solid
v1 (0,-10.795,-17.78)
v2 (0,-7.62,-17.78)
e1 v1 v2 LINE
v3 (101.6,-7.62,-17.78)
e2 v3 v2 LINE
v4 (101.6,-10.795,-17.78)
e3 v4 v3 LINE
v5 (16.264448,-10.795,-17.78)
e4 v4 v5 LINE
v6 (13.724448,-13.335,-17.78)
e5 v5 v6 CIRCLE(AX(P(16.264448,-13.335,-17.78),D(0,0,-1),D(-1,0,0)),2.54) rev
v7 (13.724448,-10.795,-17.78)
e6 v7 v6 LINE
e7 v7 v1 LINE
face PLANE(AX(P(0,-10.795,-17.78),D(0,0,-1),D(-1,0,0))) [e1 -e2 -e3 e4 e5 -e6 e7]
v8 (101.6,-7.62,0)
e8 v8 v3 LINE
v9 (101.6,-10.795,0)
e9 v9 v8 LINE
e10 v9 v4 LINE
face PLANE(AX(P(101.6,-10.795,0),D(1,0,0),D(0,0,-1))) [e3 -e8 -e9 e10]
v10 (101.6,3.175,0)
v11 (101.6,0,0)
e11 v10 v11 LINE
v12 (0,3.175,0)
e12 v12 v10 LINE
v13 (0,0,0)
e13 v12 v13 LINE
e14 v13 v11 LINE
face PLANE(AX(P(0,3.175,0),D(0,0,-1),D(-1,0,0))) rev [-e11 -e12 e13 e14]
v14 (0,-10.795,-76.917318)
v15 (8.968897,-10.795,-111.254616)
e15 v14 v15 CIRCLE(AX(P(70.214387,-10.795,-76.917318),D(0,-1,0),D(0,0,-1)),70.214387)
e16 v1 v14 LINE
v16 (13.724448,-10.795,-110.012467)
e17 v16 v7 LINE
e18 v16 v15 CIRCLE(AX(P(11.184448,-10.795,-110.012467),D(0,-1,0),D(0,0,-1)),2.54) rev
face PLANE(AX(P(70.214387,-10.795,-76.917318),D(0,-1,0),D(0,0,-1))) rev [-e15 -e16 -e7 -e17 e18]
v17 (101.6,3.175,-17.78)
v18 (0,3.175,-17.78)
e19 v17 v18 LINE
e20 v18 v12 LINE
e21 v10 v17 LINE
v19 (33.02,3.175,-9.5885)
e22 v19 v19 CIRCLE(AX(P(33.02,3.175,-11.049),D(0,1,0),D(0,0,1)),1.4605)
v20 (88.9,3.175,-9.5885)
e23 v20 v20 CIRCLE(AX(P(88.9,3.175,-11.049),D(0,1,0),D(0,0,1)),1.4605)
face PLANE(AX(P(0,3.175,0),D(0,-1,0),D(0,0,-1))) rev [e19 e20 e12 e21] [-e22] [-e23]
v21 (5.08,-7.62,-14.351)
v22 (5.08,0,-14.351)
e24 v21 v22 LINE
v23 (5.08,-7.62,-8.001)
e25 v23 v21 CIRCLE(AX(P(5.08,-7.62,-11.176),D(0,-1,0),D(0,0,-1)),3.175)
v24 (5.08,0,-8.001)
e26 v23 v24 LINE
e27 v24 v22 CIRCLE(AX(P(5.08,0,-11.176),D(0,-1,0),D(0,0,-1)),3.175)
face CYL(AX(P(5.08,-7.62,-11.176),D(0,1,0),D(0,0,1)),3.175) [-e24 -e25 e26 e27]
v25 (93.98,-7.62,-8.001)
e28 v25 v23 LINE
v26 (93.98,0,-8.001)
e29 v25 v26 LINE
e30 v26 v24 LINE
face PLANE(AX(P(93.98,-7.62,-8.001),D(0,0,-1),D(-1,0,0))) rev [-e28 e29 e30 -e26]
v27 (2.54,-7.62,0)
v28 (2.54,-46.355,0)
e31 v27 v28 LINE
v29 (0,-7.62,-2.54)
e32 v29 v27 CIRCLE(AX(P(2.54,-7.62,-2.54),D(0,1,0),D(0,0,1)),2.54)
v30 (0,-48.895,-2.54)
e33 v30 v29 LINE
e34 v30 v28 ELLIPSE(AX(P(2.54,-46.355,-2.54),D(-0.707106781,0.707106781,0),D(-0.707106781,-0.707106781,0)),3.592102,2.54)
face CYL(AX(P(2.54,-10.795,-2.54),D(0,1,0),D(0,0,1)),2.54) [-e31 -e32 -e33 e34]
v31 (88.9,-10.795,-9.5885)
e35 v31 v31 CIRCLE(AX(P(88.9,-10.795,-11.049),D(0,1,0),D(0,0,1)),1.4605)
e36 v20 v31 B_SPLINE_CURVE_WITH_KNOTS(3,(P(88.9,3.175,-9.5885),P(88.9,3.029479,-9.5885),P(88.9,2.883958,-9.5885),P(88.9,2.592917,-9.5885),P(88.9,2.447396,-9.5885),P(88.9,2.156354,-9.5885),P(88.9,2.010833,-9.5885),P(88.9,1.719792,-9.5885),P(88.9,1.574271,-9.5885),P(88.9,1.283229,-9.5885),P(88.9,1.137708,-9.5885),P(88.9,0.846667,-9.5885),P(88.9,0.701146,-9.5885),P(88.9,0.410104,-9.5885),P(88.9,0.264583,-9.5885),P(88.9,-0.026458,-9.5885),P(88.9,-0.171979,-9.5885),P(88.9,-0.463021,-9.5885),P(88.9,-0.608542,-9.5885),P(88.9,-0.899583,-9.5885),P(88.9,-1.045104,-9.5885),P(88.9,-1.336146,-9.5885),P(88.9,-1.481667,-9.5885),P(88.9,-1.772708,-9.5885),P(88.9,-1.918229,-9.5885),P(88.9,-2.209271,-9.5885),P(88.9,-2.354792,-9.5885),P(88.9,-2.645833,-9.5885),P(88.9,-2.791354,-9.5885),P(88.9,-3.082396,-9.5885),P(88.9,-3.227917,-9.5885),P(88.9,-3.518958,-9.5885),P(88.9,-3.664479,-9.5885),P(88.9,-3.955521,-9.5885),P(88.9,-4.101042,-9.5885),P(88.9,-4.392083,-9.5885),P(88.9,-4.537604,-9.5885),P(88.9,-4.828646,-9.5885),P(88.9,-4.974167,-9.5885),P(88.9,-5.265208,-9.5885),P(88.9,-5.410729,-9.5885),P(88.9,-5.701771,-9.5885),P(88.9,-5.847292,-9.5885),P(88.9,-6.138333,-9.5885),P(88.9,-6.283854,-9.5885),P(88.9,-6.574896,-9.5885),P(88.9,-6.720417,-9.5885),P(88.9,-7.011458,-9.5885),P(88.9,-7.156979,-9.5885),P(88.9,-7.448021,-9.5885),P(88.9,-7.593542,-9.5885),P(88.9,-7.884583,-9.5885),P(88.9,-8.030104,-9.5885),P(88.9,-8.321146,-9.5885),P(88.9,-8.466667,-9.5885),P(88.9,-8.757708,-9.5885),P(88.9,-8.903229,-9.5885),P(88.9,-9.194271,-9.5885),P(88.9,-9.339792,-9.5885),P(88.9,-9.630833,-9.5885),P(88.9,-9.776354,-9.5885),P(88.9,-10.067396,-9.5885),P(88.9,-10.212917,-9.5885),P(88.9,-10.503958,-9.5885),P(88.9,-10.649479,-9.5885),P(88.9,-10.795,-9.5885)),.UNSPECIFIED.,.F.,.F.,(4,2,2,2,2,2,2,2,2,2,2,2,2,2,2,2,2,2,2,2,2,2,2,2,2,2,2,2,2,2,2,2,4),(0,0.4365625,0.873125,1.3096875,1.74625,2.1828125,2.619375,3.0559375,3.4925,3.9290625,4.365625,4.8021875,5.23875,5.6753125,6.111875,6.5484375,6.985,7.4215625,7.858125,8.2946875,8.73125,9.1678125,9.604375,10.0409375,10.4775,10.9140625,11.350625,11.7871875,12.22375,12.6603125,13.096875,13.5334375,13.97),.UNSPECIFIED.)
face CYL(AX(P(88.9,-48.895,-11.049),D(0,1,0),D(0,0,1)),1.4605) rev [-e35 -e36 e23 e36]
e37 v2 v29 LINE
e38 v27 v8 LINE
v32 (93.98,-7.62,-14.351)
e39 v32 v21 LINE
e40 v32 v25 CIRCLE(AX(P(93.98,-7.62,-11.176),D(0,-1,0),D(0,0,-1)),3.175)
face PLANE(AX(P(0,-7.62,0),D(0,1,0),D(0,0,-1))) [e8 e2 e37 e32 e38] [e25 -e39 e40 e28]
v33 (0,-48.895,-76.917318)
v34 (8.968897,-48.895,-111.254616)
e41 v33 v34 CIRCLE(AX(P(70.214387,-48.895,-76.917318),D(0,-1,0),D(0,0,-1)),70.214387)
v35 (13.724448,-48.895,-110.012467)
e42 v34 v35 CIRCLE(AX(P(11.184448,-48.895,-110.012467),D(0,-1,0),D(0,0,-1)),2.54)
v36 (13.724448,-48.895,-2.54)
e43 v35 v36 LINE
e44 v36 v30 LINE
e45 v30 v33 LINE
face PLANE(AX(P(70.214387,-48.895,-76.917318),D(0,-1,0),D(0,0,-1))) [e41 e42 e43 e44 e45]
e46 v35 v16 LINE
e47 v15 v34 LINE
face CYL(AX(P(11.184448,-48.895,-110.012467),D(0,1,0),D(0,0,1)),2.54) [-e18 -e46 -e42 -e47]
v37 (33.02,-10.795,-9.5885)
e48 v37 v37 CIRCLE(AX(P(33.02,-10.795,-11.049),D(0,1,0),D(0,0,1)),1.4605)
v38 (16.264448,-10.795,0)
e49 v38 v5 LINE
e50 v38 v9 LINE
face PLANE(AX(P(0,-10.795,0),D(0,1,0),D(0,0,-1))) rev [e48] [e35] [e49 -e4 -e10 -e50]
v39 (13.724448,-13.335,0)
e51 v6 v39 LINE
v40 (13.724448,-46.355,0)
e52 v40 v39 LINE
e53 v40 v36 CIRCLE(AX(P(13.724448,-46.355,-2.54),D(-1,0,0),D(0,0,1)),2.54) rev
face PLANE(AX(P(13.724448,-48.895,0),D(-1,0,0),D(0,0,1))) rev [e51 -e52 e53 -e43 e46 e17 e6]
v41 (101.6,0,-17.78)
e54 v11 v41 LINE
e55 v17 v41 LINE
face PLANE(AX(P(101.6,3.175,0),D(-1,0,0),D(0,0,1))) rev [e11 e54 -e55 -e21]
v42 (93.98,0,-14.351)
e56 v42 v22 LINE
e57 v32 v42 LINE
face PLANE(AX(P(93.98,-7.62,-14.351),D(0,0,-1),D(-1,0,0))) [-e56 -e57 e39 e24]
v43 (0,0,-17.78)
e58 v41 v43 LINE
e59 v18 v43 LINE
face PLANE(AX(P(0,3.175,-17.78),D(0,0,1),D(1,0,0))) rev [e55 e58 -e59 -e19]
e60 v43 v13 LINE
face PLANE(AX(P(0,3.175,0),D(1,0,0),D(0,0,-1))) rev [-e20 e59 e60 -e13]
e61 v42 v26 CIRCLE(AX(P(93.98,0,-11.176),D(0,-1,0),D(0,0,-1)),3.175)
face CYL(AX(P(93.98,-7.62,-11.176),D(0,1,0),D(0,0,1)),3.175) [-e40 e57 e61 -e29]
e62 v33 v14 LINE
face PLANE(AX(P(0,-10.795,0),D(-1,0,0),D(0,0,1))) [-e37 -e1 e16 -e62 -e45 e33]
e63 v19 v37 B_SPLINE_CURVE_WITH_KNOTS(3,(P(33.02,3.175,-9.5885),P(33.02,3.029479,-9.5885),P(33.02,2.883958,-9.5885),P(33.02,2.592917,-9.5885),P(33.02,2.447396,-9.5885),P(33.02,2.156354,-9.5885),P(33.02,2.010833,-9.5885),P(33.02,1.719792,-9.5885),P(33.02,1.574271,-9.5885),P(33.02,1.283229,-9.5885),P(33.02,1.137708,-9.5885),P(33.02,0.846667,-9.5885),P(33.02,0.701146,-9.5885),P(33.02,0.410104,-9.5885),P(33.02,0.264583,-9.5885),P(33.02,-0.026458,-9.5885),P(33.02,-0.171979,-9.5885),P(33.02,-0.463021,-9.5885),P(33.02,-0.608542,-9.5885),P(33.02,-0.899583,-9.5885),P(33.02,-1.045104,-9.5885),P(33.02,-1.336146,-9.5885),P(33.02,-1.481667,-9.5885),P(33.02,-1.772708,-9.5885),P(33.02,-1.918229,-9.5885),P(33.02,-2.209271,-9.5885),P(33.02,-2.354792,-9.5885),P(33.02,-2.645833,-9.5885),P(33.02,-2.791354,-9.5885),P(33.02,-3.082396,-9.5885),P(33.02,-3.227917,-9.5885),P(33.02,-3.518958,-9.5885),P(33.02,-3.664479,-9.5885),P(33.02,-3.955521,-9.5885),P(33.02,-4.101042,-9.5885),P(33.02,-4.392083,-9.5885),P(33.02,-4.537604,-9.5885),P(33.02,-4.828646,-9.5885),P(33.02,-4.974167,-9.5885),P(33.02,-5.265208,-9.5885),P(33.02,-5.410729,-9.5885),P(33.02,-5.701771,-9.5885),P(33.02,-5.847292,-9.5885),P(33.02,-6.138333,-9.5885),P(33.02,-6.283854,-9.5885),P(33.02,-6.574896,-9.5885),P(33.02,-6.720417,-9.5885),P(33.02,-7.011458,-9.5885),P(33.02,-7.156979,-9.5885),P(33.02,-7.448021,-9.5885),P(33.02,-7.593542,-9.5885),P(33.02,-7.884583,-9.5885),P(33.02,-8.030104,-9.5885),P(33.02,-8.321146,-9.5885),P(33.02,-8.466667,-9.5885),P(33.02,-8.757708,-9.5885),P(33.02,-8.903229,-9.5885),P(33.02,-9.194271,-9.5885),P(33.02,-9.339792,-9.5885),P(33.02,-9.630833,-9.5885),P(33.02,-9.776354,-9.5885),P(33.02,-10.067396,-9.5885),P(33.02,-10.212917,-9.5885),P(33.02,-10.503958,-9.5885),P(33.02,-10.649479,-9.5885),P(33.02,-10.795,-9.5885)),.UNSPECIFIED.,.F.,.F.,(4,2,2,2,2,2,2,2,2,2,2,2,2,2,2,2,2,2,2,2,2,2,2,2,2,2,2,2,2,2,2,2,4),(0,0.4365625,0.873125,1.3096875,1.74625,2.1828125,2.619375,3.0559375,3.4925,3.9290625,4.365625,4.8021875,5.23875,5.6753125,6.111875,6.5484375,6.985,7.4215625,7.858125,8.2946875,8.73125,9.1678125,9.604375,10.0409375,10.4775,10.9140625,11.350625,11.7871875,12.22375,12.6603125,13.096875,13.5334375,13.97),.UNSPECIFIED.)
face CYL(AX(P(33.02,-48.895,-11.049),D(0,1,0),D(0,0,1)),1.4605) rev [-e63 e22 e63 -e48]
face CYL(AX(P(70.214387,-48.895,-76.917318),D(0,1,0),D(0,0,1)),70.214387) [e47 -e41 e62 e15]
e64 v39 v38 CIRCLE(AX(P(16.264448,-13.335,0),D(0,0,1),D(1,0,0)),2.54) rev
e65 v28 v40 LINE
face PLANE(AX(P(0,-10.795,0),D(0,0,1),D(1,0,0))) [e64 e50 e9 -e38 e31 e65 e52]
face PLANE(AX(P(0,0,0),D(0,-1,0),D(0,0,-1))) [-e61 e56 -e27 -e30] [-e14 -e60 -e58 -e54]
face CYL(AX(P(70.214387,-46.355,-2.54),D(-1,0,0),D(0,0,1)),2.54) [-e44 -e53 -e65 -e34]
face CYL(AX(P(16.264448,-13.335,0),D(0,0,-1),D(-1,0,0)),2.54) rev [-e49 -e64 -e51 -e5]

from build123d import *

# Parameters (mm, degrees)
SKETCH2_W           = 101.6
SKETCH2_H           = 17.78
BOSS_EXTRUDE1_DEPTH = 3.175
BOSS_EXTRUDE2_DEPTH = 7.62
BOSS_EXTRUDE3_DEPTH = 38.1
FILLET2_R           = 2.54
FILLET3_R           = 2.54
SKETCH6_R           = 1.4605
CUT_EXTRUDE1_DEPTH  = 161.318129994


with BuildPart() as part:
    # Sketch2 → Boss-Extrude1 (new body)
    with BuildSketch(Plane(origin=(0, 0, 0), x_dir=(1, 0, 0), z_dir=(0, 1, 0))):
        with Locations((50.8, 8.89)):
            Rectangle(SKETCH2_W, SKETCH2_H)
    boss_extrude1 = extrude(amount=BOSS_EXTRUDE1_DEPTH)

    # Sketch3 → Boss-Extrude2 (add)
    with BuildSketch(Plane.XZ):
        with BuildLine():
            Line((93.98, -14.351), (5.08, -14.351))
            ThreePointArc((5.08, -14.351), (1.905, -11.176), (5.08, -8.001))
            Line((5.08, -8.001), (93.98, -8.001))
            ThreePointArc((93.98, -8.001), (97.155, -11.176), (93.98, -14.351))
        make_face()
    extrude(amount=BOSS_EXTRUDE2_DEPTH)

    # Mirror1: Boss-Extrude1 across plane
    add(boss_extrude1.mirror(Plane(origin=(0, -3.81, 0), x_dir=(0, 0, 1), z_dir=(0, -1, 0))))

    # Sketch5 → Boss-Extrude3 (add)
    with BuildSketch(Plane.XZ.offset(10.795)):
        with BuildLine():
            Line((0, 0), (13.724447784, 0))
            Line((13.724447784, 0), (13.724447784, -118.618))
            ThreePointArc((13.724447784, -118.618), (3.519309988, -98.867872234), (0, -76.917317766))
            Line((0, -76.917317766), (0, 0))
        make_face()
    extrude(amount=BOSS_EXTRUDE3_DEPTH)

    # Fillet2
    fillet2_edges = [part.edges().sort_by_distance(p)[0] for p in [
        (13.724447784, -29.845, -118.618),
    ]]
    fillet(fillet2_edges, radius=FILLET2_R)

    # Fillet3
    # the kernel refuses this fillet: 2.54 mm, written as the material it adds along each edge
    with BuildSketch(Plane(origin=(13.724447784, -10.795, 0), x_dir=(0, -1, 0), z_dir=(0, 0, -1))) as fillet3_piece_1:
        with BuildLine():
            CenterArc((FILLET3_R, -FILLET3_R), FILLET3_R, 90, 90)
            Line((0, -FILLET3_R), (0, 0))
            Line((0, 0), (FILLET3_R, 0))
        make_face()
    extrude(amount=17.78)
    # the kernel refuses this fillet: 2.54 mm, written as the material it takes off along each edge
    with BuildSketch(Plane(origin=(0, -1.27, 0), x_dir=(0, 0, -1), z_dir=(0, -1, 0))) as fillet3_2_piece_1:
        with BuildLine():
            CenterArc((FILLET3_R, FILLET3_R), FILLET3_R, 180, 90)
            Line((0, FILLET3_R), (0, 0))
            Line((0, 0), (FILLET3_R, 0))
        make_face()
    extrude(amount=53.975, mode=Mode.SUBTRACT)
    with BuildSketch(Plane(origin=(-6.35, -48.895, 0), x_dir=(0, 0, -1), z_dir=(1, 0, 0))) as fillet3_2_piece_2:
        with BuildLine():
            CenterArc((FILLET3_R, FILLET3_R), FILLET3_R, 180, 90)
            Line((0, FILLET3_R), (0, 0))
            Line((0, 0), (FILLET3_R, 0))
        make_face()
    extrude(amount=26.424447784, mode=Mode.SUBTRACT)

    # Sketch6 → Cut-Extrude1 (cut, through all)
    with BuildSketch(Plane(origin=(0, 3.175, 0), x_dir=(1, 0, 0), z_dir=(0, 1, 0))):
        with Locations(Location((88.9, 11.049, 0), (0, 0, 270))):
            Circle(SKETCH6_R)
        with Locations(Location((33.02, 11.049, 0), (0, 0, 270))):
            Circle(SKETCH6_R)
    extrude(amount=-CUT_EXTRUDE1_DEPTH, mode=Mode.SUBTRACT)


solid = part.part
